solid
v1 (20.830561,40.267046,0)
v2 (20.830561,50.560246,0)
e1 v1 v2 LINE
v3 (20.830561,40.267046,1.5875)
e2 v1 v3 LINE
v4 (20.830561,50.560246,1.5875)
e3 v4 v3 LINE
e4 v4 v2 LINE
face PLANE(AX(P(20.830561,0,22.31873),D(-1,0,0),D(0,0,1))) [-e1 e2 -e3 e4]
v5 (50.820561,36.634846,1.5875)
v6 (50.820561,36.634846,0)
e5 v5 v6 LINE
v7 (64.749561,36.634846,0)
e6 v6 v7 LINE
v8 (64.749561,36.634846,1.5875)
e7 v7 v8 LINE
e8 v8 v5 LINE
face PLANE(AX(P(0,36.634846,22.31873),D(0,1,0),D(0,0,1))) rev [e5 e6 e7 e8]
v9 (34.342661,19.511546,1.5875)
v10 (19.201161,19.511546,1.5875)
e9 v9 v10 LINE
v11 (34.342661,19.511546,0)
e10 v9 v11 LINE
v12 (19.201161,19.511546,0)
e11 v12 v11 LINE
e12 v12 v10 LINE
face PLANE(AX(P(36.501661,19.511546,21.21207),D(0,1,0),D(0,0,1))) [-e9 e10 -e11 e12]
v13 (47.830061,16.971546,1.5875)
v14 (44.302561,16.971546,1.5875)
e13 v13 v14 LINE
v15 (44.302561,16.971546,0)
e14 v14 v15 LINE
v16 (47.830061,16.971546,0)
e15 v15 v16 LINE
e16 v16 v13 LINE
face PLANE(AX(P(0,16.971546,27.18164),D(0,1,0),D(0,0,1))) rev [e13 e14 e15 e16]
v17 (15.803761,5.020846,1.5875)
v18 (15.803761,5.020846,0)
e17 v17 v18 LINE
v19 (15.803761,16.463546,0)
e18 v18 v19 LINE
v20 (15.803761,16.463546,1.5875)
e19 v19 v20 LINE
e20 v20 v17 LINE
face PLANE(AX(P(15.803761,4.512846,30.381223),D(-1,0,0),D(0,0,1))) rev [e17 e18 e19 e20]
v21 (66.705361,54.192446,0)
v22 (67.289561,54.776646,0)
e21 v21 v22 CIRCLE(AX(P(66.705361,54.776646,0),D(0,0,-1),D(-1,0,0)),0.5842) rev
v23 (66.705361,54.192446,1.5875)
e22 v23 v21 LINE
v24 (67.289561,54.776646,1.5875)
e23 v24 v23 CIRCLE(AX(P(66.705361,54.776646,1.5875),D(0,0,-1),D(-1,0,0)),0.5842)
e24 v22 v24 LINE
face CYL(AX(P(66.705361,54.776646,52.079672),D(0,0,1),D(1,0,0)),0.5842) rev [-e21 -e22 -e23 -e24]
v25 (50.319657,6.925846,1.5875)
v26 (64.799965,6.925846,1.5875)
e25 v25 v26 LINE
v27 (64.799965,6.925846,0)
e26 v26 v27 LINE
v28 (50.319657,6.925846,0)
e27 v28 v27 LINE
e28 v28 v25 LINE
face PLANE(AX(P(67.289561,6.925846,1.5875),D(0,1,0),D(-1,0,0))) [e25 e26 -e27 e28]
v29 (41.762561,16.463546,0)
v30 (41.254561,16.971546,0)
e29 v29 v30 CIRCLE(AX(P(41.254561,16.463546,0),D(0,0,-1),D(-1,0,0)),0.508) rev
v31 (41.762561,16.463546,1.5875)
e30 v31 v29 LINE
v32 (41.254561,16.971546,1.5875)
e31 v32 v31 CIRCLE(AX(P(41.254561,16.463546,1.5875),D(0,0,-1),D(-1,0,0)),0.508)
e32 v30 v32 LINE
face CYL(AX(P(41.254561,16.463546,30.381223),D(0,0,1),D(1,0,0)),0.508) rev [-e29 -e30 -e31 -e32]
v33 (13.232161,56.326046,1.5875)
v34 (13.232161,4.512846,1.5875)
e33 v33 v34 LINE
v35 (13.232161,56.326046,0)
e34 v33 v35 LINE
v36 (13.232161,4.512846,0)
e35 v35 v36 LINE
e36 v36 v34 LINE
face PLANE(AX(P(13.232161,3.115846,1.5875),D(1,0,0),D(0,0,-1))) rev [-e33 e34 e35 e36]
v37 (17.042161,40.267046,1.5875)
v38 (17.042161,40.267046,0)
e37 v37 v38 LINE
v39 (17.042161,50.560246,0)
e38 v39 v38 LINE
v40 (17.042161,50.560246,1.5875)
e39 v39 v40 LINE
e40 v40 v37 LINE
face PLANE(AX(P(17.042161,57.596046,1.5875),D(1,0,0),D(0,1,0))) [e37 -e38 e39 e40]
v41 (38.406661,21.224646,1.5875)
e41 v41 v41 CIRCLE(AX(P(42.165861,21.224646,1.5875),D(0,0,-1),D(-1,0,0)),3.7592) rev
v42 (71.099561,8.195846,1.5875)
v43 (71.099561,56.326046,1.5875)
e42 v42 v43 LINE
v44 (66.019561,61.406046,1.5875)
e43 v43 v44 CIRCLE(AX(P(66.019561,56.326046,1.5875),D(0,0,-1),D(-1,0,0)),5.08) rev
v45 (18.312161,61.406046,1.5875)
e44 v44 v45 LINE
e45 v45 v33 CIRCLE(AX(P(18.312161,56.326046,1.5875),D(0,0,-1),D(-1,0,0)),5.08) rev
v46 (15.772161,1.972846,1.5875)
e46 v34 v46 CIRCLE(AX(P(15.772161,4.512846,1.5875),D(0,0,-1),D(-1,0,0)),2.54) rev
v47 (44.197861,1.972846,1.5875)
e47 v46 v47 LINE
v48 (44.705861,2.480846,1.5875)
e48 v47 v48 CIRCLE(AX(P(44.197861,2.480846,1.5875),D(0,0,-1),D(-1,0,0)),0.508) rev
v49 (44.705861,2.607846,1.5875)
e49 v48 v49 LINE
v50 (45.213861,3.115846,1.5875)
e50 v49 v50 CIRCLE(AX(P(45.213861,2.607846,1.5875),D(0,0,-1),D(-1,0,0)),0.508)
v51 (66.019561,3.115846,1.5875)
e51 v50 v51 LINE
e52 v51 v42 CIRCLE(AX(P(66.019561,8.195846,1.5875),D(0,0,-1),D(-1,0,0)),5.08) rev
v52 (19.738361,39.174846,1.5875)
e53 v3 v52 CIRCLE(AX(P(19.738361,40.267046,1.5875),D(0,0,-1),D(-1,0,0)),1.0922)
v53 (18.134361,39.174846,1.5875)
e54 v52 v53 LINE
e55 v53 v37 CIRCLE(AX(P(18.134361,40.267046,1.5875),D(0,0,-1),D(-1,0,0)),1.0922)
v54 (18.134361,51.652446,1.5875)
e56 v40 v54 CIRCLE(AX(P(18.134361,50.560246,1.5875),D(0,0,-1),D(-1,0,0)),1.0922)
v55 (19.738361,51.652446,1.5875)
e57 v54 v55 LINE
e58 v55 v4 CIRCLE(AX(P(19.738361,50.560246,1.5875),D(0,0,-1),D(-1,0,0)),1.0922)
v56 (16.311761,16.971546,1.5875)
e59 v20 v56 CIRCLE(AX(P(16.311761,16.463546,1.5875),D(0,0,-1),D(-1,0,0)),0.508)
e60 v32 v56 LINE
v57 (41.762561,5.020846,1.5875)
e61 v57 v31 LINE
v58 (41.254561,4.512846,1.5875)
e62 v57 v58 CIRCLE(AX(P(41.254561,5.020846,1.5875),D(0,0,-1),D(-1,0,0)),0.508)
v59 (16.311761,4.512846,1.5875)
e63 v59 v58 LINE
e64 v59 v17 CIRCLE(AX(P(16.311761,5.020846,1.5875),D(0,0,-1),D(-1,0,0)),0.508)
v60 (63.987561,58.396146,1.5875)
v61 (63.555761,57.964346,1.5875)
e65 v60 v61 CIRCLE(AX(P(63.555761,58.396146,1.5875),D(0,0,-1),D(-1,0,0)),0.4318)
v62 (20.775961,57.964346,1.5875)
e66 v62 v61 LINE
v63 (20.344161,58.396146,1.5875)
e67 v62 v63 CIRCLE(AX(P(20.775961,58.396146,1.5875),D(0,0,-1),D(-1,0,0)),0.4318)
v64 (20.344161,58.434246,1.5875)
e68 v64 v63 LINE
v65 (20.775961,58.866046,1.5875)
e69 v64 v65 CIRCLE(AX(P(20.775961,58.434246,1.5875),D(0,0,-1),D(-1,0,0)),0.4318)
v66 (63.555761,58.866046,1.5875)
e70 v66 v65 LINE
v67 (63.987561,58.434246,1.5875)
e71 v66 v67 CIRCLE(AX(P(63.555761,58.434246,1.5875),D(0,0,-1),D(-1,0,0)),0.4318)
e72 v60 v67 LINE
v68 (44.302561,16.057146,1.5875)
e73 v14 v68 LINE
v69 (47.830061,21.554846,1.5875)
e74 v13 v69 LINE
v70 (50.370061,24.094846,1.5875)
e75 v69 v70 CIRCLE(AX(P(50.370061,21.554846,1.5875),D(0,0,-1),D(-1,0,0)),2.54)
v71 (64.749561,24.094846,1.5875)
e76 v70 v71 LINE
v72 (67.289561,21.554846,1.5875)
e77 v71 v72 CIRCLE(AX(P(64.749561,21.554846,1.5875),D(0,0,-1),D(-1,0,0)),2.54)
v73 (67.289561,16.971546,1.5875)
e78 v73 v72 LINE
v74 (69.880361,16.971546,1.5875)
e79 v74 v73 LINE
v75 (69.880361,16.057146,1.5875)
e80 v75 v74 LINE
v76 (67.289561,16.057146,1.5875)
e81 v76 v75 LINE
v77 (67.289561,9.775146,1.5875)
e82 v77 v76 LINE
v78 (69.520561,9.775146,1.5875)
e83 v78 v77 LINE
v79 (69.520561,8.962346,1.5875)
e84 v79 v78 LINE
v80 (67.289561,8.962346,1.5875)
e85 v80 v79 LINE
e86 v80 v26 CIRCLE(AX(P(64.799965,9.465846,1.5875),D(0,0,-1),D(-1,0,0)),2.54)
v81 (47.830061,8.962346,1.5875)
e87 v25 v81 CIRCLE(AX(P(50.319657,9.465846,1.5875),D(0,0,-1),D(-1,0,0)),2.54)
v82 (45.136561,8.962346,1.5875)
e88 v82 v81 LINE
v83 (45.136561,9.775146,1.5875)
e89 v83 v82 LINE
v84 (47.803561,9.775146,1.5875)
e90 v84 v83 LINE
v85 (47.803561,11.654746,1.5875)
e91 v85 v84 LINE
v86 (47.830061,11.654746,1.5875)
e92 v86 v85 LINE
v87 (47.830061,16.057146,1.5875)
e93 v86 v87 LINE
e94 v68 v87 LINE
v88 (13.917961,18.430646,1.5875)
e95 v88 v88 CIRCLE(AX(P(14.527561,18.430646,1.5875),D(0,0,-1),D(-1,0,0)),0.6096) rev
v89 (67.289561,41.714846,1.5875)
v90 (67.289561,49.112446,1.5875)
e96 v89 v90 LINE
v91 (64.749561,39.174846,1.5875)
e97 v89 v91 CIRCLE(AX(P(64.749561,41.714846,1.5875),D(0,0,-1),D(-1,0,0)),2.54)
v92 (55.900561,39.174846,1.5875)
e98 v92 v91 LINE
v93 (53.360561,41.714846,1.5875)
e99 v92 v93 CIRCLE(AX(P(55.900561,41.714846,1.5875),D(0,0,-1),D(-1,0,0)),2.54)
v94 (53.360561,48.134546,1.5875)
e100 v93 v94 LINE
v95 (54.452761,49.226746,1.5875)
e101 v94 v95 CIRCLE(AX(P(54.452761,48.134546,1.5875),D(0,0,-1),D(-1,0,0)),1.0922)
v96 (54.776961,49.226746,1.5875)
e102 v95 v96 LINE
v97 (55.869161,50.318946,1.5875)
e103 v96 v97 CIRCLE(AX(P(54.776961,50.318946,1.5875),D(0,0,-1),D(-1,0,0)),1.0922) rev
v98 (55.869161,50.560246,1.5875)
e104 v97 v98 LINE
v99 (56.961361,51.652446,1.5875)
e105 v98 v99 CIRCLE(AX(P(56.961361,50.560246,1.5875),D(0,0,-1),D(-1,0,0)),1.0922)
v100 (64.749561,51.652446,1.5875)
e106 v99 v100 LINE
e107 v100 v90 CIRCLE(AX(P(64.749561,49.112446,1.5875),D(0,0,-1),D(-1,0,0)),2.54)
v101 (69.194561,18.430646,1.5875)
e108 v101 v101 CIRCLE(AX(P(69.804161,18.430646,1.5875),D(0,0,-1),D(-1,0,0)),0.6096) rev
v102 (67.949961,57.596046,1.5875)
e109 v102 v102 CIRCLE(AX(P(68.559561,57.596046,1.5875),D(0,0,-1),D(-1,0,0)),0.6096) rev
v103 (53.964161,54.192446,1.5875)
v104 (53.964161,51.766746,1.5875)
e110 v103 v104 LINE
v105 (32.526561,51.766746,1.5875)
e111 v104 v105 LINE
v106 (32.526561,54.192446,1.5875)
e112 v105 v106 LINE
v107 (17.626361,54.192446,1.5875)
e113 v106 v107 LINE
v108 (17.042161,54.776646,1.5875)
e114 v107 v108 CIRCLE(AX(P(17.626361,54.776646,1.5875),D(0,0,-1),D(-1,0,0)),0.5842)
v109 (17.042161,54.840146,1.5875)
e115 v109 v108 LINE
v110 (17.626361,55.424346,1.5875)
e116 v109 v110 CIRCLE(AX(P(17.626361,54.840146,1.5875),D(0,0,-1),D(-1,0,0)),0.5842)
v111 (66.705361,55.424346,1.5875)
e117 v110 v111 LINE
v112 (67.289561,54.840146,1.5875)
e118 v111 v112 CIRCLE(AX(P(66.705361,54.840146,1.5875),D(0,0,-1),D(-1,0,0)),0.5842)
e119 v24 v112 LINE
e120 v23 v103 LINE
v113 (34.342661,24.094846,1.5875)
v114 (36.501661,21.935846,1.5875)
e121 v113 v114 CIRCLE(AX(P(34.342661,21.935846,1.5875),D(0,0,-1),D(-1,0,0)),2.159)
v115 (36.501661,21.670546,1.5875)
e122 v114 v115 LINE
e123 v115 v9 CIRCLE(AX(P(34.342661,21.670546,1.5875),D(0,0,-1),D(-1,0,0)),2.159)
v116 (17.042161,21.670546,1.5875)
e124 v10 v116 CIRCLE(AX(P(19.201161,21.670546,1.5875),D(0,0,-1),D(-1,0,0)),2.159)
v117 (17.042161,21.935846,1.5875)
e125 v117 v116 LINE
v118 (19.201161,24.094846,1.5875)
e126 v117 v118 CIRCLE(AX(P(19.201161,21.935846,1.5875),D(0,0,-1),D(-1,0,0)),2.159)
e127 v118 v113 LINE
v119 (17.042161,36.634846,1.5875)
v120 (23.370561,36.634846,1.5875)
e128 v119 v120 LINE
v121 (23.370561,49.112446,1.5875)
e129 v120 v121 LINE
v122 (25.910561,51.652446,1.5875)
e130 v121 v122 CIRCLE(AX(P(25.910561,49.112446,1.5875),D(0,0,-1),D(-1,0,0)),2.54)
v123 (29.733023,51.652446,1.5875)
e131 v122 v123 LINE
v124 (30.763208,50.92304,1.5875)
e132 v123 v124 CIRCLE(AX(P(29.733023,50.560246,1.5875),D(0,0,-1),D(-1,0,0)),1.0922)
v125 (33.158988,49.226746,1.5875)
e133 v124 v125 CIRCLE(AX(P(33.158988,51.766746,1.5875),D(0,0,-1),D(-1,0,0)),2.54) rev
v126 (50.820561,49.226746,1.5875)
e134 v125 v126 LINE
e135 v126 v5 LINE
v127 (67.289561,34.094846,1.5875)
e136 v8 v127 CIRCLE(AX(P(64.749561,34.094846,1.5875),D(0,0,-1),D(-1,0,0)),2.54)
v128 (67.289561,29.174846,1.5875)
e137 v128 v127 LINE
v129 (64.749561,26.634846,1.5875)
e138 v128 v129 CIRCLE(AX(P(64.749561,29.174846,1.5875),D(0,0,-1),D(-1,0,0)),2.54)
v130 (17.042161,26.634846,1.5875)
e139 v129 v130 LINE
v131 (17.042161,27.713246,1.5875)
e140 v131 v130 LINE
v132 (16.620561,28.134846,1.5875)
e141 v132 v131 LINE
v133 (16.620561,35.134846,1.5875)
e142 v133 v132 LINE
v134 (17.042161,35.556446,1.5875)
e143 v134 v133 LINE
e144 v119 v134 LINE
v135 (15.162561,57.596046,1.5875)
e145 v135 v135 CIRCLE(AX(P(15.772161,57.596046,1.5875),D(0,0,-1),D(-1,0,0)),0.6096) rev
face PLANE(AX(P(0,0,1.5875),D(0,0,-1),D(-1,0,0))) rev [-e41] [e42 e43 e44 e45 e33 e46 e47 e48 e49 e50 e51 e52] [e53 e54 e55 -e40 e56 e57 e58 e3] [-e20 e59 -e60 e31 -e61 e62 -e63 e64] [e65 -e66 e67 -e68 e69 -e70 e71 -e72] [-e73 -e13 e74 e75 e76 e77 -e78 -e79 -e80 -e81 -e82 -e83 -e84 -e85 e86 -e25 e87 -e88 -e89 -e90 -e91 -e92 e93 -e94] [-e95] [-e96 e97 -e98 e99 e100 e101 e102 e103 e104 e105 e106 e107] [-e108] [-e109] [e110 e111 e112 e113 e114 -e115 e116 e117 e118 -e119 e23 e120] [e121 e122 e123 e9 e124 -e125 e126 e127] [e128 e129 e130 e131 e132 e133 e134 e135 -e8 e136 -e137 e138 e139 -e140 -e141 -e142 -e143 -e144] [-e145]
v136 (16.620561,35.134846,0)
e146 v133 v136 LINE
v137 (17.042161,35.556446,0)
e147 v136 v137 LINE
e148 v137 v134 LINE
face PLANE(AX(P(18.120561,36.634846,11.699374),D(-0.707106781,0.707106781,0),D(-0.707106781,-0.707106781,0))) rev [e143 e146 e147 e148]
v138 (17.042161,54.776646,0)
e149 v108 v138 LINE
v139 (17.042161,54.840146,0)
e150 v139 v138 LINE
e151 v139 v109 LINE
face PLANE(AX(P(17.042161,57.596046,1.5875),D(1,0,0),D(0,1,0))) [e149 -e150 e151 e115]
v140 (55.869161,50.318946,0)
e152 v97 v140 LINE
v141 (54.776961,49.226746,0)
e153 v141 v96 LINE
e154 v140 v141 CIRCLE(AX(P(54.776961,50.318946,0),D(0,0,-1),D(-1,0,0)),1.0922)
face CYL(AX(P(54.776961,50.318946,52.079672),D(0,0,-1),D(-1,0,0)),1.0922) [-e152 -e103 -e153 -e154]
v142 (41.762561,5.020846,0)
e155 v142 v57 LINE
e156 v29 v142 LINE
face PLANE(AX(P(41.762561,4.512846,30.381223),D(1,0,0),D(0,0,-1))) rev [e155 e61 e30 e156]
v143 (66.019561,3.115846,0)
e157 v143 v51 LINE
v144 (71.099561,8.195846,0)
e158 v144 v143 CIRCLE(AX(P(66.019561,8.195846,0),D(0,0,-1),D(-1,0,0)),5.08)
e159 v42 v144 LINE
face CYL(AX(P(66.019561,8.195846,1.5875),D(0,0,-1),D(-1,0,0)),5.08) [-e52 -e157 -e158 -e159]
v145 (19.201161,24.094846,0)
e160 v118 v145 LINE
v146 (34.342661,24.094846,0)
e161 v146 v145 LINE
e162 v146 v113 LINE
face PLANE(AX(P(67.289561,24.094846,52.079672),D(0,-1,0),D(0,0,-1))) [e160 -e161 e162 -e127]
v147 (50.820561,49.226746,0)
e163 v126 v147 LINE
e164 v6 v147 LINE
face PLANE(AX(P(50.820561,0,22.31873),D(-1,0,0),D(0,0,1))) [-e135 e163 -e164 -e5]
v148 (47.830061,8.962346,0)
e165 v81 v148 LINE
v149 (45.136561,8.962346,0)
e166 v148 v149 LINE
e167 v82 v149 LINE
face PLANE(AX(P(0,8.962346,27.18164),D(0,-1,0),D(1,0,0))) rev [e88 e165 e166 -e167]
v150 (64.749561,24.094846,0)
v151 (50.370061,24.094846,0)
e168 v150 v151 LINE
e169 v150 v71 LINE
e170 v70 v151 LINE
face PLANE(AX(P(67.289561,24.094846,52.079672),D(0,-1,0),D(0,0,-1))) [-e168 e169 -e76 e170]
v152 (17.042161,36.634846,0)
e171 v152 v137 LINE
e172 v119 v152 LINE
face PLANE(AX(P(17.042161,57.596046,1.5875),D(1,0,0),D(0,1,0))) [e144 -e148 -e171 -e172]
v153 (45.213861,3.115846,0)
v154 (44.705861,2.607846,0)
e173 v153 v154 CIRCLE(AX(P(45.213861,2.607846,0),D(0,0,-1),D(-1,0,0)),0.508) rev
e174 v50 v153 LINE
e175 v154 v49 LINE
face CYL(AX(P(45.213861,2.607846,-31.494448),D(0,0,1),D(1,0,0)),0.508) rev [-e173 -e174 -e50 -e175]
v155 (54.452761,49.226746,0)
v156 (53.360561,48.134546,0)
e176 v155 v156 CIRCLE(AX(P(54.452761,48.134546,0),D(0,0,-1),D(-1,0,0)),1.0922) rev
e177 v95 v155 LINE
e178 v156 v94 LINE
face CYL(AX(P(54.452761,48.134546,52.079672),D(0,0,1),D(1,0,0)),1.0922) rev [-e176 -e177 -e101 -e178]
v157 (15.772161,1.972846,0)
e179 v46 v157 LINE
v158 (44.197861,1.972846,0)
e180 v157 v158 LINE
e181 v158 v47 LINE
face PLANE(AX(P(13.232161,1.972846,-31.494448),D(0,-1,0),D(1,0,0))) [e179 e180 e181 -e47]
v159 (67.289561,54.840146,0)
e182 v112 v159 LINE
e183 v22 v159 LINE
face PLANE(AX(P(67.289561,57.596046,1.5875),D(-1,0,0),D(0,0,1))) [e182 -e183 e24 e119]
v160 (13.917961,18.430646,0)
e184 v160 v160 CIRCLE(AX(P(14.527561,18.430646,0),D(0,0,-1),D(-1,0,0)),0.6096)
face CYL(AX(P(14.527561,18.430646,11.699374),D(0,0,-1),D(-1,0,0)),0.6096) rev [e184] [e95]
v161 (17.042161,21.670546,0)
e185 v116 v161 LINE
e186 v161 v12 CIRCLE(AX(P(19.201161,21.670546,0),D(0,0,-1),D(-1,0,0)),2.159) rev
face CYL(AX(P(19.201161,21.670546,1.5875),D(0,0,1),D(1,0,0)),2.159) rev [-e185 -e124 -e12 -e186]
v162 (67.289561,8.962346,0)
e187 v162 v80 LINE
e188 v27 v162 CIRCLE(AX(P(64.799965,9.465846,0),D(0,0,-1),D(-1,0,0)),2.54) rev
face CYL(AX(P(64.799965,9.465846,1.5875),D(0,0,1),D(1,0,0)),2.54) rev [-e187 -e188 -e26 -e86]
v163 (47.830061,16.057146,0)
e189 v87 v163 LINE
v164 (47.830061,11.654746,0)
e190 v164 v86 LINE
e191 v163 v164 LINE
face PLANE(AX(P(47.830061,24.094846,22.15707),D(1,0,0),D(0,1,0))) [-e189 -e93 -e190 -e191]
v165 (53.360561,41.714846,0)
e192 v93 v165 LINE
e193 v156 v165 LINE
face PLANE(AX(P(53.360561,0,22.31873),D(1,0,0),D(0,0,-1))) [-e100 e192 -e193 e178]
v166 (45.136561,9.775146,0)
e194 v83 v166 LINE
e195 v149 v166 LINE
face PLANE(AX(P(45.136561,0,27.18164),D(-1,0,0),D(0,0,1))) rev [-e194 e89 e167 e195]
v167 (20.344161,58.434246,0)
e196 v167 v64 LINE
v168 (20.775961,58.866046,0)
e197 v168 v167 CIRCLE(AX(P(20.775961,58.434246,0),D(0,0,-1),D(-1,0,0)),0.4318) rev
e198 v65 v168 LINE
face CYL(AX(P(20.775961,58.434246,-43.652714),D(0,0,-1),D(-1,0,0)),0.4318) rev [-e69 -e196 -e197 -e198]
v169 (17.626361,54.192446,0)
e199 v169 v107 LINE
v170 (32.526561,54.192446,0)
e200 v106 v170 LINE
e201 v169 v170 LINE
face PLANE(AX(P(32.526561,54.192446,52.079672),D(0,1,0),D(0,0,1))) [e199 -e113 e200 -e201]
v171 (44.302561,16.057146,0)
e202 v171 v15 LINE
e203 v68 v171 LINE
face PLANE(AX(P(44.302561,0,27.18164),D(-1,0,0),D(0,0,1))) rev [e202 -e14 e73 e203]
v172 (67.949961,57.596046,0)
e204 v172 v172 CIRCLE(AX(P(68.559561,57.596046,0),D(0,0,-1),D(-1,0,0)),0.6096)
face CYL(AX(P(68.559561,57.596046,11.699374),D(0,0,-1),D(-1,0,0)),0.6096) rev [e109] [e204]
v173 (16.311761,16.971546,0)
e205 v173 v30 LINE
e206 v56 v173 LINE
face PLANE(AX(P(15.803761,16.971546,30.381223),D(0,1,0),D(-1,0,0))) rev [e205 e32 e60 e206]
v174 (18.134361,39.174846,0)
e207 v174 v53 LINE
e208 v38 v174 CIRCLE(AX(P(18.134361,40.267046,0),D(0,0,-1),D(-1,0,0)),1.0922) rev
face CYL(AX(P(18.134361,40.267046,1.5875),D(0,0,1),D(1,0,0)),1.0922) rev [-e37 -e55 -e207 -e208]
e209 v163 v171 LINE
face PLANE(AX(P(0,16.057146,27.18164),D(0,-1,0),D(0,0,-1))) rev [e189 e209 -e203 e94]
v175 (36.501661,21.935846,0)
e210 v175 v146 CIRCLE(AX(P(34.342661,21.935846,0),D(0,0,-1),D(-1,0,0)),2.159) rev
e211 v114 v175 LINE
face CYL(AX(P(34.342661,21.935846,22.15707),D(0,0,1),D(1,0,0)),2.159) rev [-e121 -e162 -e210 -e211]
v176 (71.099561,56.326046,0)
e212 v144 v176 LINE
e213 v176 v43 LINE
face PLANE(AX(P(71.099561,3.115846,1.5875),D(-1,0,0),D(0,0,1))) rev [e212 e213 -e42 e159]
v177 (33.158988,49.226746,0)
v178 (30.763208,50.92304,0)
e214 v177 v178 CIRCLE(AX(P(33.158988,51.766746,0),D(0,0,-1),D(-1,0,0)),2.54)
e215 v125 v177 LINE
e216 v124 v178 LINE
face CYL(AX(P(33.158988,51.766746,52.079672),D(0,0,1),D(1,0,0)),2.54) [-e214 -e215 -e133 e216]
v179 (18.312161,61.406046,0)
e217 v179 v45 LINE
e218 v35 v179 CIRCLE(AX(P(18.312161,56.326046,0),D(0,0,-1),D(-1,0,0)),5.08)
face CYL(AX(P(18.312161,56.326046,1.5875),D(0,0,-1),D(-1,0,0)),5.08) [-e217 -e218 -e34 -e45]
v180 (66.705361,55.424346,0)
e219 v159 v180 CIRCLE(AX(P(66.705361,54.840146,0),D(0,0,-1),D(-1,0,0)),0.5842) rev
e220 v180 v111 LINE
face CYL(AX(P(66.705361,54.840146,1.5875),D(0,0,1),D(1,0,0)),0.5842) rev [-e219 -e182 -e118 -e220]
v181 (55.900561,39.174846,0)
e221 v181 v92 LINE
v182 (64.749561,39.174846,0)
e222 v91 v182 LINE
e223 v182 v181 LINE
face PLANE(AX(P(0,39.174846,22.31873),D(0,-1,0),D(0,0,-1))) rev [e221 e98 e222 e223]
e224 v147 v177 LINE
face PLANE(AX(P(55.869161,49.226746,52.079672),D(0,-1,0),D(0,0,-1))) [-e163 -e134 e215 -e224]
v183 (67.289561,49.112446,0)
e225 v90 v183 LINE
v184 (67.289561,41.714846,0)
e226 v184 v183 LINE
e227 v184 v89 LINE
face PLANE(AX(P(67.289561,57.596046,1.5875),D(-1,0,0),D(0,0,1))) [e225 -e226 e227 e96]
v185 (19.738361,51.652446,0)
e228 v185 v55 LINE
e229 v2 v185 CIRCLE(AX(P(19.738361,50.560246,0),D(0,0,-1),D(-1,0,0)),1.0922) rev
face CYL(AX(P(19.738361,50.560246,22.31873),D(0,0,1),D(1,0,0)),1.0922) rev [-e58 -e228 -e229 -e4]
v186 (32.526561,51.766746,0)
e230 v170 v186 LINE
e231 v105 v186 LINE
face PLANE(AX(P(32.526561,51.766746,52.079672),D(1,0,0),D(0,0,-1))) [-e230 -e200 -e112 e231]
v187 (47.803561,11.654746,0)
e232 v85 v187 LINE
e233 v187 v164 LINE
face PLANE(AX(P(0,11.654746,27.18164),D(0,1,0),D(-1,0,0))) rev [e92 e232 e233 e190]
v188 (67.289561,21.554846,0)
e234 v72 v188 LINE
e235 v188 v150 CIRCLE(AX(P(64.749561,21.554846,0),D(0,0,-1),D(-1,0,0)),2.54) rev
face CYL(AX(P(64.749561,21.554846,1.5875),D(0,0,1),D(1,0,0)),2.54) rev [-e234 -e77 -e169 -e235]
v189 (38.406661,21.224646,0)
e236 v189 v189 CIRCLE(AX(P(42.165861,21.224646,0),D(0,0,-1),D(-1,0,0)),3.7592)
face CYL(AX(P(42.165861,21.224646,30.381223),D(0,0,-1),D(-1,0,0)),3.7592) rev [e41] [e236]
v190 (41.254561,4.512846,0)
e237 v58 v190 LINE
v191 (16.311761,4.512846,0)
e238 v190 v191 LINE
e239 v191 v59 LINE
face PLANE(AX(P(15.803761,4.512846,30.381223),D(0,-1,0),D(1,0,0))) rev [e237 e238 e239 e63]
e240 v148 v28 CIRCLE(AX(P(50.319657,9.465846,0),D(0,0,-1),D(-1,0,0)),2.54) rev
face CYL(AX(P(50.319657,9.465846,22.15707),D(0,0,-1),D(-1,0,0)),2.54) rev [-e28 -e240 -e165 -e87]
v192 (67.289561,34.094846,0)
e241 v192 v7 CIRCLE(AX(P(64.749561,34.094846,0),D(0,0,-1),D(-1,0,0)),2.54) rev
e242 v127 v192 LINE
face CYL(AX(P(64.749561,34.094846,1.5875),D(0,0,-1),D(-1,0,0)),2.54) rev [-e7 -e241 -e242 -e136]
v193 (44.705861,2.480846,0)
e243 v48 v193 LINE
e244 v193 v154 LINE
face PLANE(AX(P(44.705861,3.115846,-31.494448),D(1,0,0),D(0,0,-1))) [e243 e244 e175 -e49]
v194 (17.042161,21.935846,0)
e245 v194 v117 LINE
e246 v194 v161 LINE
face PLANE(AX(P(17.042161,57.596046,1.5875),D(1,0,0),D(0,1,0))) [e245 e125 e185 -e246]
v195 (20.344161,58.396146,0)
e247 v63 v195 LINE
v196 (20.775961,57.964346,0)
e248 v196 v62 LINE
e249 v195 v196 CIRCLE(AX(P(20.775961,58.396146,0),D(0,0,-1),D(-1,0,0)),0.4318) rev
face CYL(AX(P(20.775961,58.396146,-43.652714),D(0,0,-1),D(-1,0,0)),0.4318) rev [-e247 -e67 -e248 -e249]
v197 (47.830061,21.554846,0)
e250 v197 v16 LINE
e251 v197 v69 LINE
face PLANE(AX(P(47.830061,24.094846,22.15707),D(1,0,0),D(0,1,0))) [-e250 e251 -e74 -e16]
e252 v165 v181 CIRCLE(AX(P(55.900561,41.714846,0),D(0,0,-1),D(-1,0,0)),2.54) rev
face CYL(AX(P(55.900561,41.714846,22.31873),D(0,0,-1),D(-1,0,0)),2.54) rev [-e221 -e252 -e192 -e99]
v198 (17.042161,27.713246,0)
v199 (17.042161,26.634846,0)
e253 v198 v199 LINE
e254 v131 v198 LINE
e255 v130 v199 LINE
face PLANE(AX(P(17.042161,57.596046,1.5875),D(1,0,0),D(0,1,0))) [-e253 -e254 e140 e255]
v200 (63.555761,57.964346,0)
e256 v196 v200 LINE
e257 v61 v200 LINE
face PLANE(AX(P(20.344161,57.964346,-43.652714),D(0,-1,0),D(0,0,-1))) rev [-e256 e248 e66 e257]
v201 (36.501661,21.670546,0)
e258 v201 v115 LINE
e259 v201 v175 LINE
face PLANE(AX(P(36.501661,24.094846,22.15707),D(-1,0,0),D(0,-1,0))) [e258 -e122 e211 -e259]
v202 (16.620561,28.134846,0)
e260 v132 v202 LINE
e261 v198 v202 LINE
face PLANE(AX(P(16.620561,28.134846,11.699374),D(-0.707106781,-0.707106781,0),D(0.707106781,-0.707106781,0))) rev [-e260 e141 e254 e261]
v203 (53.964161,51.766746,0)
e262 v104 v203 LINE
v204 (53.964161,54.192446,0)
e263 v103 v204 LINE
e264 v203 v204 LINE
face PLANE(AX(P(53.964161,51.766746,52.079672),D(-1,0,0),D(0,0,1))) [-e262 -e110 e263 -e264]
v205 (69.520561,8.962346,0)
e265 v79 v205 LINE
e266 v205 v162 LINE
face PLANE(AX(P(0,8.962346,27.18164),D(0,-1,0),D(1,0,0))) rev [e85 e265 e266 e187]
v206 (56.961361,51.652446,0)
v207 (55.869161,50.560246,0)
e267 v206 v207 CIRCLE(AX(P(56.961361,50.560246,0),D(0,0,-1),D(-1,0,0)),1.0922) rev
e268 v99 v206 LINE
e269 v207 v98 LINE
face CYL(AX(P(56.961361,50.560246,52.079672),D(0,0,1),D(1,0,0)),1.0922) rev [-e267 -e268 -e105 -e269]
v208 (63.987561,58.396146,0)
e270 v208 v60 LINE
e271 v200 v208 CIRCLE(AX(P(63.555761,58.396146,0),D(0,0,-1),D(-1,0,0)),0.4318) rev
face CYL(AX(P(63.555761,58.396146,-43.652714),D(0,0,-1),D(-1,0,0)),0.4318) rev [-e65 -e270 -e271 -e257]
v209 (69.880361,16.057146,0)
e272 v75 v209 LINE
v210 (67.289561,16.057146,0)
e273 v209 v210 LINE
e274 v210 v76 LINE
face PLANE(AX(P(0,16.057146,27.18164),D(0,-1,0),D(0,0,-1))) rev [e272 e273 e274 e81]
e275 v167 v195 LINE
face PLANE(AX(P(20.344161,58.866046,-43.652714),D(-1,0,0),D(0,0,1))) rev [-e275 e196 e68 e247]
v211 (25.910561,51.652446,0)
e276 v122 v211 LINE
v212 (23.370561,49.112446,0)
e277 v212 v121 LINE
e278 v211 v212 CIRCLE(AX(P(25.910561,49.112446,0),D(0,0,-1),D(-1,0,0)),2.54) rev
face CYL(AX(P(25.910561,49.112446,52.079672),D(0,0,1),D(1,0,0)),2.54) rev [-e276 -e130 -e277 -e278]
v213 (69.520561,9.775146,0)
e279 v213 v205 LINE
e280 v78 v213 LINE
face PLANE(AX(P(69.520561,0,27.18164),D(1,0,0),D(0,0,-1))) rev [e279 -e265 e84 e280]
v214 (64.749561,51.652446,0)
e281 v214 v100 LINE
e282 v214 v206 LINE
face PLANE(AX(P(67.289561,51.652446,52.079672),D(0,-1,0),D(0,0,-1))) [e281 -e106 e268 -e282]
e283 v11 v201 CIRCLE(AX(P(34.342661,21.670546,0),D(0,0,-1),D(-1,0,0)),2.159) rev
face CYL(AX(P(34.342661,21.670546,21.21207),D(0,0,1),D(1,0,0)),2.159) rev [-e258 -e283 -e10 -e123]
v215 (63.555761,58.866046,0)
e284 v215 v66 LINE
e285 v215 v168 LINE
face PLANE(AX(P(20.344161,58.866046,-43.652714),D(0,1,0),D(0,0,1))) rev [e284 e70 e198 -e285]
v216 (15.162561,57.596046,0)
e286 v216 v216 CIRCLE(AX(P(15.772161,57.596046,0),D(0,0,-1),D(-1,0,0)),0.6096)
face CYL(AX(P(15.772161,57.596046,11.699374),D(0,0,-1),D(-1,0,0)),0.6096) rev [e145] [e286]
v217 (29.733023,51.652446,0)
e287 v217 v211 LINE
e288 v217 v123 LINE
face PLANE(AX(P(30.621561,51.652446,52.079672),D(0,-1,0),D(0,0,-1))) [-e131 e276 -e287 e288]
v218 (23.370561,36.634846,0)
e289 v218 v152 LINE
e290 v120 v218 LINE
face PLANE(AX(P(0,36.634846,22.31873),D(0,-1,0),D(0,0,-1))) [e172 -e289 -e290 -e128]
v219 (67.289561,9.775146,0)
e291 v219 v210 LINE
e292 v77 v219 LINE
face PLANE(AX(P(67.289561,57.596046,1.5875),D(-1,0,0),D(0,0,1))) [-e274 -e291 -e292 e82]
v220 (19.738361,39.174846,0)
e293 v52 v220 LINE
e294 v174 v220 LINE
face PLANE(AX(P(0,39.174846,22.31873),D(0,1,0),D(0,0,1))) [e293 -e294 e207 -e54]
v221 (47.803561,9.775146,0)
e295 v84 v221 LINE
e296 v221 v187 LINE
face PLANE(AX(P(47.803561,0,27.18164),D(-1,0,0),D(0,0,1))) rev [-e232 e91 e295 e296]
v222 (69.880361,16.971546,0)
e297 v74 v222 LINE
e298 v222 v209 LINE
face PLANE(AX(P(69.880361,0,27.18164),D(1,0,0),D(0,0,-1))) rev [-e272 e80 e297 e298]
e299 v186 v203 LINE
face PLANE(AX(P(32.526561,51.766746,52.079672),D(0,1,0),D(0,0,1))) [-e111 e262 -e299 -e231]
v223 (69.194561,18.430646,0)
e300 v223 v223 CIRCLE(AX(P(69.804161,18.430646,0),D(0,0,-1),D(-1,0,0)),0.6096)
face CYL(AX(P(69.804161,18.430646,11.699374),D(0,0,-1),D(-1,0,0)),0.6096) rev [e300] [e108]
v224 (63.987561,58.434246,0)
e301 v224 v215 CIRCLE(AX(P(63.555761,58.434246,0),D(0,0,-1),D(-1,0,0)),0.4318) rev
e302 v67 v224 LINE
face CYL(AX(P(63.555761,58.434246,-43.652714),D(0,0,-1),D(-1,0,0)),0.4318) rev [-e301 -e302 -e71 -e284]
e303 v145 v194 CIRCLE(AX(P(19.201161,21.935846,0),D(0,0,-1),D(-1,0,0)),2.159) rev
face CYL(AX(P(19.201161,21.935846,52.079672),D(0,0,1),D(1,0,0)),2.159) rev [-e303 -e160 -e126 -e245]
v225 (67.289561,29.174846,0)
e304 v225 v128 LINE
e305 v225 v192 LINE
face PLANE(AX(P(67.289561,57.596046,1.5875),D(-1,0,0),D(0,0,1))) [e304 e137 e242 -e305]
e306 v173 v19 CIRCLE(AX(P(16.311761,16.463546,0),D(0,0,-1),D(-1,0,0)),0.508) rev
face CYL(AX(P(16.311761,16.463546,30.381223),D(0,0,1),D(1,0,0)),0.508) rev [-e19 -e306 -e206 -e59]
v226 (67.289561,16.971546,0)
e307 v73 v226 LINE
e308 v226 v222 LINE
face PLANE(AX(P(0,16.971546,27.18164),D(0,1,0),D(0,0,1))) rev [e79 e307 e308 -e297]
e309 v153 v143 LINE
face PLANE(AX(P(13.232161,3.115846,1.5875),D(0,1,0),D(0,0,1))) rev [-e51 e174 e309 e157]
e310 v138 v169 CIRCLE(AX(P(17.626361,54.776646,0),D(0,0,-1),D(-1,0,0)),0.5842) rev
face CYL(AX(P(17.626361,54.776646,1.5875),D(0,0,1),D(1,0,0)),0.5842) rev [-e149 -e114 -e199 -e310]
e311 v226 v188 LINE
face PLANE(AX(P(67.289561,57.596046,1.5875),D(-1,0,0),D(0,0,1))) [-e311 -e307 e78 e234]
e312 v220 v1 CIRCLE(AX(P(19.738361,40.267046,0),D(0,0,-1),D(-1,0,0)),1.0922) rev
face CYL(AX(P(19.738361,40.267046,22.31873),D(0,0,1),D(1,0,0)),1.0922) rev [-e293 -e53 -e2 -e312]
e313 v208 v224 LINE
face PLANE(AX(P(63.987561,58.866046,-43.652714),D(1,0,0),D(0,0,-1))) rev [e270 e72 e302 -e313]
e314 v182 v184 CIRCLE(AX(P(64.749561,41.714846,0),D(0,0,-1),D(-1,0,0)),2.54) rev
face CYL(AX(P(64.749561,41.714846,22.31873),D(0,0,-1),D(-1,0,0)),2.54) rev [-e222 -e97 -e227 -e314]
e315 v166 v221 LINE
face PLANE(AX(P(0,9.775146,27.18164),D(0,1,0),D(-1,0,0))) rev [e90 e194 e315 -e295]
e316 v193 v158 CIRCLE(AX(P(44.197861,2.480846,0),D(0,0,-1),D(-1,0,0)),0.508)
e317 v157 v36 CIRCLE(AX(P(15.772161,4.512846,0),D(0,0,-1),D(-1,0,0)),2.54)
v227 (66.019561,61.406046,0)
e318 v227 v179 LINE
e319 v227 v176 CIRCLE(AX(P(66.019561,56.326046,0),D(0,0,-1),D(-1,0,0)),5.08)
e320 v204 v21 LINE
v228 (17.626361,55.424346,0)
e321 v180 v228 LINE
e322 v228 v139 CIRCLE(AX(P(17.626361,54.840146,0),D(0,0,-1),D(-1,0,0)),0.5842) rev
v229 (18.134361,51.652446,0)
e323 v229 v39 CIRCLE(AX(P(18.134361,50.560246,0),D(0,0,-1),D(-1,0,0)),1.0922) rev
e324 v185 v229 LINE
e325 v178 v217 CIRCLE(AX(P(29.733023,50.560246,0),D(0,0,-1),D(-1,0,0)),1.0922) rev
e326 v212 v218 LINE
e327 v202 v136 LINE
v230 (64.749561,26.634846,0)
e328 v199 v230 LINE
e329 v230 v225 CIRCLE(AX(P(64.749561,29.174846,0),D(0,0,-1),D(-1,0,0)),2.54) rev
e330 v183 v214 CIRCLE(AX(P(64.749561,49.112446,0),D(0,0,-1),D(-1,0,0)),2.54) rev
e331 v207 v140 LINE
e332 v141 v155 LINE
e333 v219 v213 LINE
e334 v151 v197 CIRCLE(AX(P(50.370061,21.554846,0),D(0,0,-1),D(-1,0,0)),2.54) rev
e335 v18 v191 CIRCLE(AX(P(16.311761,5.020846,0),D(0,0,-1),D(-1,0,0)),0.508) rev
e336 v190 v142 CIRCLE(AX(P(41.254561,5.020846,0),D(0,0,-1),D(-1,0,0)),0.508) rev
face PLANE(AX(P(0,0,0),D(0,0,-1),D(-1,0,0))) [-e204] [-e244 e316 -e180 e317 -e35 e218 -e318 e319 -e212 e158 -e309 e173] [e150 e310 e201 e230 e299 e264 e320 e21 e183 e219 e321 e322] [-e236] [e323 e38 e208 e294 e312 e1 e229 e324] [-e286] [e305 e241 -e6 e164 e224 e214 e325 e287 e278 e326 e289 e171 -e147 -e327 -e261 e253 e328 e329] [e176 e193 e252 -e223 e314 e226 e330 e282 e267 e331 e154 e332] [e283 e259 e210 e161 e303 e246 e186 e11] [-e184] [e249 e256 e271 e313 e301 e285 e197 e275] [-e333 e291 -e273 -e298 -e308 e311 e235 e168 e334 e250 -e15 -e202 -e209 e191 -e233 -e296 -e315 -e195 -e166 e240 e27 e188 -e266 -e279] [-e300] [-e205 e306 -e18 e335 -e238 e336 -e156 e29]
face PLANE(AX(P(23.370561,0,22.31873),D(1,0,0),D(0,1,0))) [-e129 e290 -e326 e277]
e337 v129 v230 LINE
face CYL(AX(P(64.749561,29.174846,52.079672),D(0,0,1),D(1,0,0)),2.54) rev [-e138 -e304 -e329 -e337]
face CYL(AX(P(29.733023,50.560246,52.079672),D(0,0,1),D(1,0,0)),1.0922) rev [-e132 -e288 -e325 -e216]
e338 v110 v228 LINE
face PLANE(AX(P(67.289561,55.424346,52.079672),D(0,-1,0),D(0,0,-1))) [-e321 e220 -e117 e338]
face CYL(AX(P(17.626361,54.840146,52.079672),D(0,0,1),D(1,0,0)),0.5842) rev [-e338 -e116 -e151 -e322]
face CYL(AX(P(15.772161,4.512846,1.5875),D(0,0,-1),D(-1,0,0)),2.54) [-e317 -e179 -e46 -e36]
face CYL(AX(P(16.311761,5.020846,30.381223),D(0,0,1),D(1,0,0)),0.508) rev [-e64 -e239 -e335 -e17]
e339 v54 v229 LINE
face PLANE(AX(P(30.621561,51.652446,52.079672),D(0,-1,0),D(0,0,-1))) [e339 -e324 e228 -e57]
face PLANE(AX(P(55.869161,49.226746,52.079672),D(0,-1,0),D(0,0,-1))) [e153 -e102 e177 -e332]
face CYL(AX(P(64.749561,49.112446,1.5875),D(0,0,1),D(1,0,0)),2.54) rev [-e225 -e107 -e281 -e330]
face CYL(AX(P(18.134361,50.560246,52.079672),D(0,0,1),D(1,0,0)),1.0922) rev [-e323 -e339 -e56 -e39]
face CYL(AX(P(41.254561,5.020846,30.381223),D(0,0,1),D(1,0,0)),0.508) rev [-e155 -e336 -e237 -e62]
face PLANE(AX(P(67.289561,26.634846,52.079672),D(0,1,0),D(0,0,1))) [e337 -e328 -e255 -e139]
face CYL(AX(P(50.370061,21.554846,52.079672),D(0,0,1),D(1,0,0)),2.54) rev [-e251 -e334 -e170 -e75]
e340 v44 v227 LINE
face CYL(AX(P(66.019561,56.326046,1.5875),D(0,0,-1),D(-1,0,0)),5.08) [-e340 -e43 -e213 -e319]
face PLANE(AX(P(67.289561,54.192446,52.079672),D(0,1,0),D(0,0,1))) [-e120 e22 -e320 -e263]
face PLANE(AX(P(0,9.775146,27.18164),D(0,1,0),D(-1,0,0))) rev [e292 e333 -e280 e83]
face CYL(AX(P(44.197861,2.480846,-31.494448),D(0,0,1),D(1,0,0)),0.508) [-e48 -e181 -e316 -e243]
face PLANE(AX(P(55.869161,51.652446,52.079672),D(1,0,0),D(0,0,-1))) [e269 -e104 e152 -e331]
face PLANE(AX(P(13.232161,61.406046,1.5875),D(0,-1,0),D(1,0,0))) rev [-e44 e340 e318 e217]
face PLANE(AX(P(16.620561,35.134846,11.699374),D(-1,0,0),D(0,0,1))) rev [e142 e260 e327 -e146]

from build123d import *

# Parameters (mm, degrees)
SKETCH1_W           = 57.8674
SKETCH1_H           = 58.2902
SKETCH1_W_2         = 50.2474
SKETCH1_H_2         = 50.6702
BOSS_EXTRUDE1_DEPTH = 1.5875
SKETCH2_W           = 50.2474
SKETCH2_H           = 2.54
SKETCH2_H_2         = 2.1717
BOSS_EXTRUDE2_DEPTH = 1.5875
BOSS_EXTRUDE3_DEPTH = 1.5875
SKETCH4_W           = 11.3284
SKETCH4_H           = 17.169
BOSS_EXTRUDE4_DEPTH = 1.5875
SKETCH5_R           = 3.7592
SKETCH5_W           = 25.9588
SKETCH5_H           = 12.4587
CUT_EXTRUDE1_DEPTH  = 1.5875
SKETCH8_W           = 19.4595
SKETCH8_H           = 2.54
BOSS_EXTRUDE5_DEPTH = 1.5875
FILLET1_R           = 5.08
FILLET2_START       = -1
FILLET2_DEPTH       = 4
FILLET2_2_DEPTH     = 1.5875
FILLET3_R           = 1.0922
FILLET4_R           = 0.5842
FILLET8_R           = 2.159
SKETCH6_R           = 0.6096
CUT_EXTRUDE2_DEPTH  = 1.5875
SKETCH7_W           = 24.384
SKETCH7_H           = 0.8128
SKETCH7_W_2         = 19.05
SKETCH7_H_2         = 1.8796
SKETCH7_W_3         = 25.5778
SKETCH7_H_3         = 0.9144
CUT_EXTRUDE3_DEPTH  = 1.5875
FILLET6_R           = 0.508
SKETCH9_W           = 43.6434
SKETCH9_H           = 0.9017
CUT_EXTRUDE4_DEPTH  = 1.5875
FILLET7_R           = 0.4318
FILLET9_R           = 2.54
SKETCH10_W          = 31.4737
SKETCH10_H          = 1.143
BOSS_EXTRUDE6_DEPTH = 1.5875
FILLET10_R          = 2.54
FILLET11_R          = 0.508


with BuildPart() as part:
    # Sketch1 → Boss-Extrude1 (new body)
    with BuildSketch(Plane.XY):
        with Locations((42.165860751, 32.260946044)):
            Rectangle(SKETCH1_W, SKETCH1_H)
        with Locations((42.165860751, 32.260946044)):
            Rectangle(SKETCH1_W_2, SKETCH1_H_2, mode=Mode.SUBTRACT)
    extrude(amount=BOSS_EXTRUDE1_DEPTH)

    # Sketch2 → Boss-Extrude2 (add)
    with BuildSketch(Plane(origin=(0, 0, 0), x_dir=(-1, 0, 0), z_dir=(0, 0, -1))):
        with Locations((-42.165860751, 25.364846044)):
            Rectangle(SKETCH2_W, SKETCH2_H)
        Polygon((-67.289560751, 54.192446044), (-53.964160751, 54.192446044), (-53.964160751, 51.766746044), (-32.526560751, 51.766746044), (-32.526560751, 54.192446044), (-17.042160751, 54.192446044), (-17.042160751, 51.652446044), (-30.621560751, 51.652446044), (-30.621560751, 49.226746044), (-55.869160751, 49.226746044), (-55.869160751, 51.652446044), (-67.289560751, 51.652446044), align=None)
        with Locations((-42.165860751, 56.510196044)):
            Rectangle(SKETCH2_W, SKETCH2_H_2)
    extrude(amount=-BOSS_EXTRUDE2_DEPTH)

    # Sketch3 → Boss-Extrude3 (add)
    with BuildSketch(Plane(origin=(0, 0, 0), x_dir=(-1, 0, 0), z_dir=(0, 0, -1))):
        Polygon((-57.820560751, 36.634846044), (-50.820560751, 36.634846044), (-50.820560751, 28.408046044), (-50.820560751, 49.226746044), (-53.360560751, 49.226746044), (-53.360560751, 39.174846044), (-67.289560751, 39.174846044), (-67.289560751, 36.634846044), align=None)
        Polygon((-23.370560751, 36.634846044), (-20.120560751, 36.634846044), (-17.042160751, 36.634846044), (-17.042160751, 39.174846044), (-20.830560751, 39.174846044), (-20.830560751, 51.652446044), (-23.370560751, 51.652446044), align=None)
    extrude(amount=-BOSS_EXTRUDE3_DEPTH)

    # Sketch4 → Boss-Extrude4 (add)
    with BuildSketch(Plane(origin=(0, 0, 0), x_dir=(-1, 0, 0), z_dir=(0, 0, -1))):
        with Locations((-42.165860751, 15.510346044)):
            Rectangle(SKETCH4_W, SKETCH4_H)
    extrude(amount=-BOSS_EXTRUDE4_DEPTH)

    # Sketch5 → Cut-Extrude1 (cut)
    with BuildSketch(Plane(origin=(0, 0, 0), x_dir=(-1, 0, 0), z_dir=(0, 0, -1))):
        with Locations((-42.165860751, 21.224646044)):
            Circle(SKETCH5_R)
        with Locations((-28.783160751, 10.742196044)):
            Rectangle(SKETCH5_W, SKETCH5_H)
    extrude(amount=-CUT_EXTRUDE1_DEPTH, mode=Mode.SUBTRACT)

    # Sketch8 → Boss-Extrude5 (add)
    with BuildSketch(Plane(origin=(0, 0, 0), x_dir=(-1, 0, 0), z_dir=(0, 0, -1))):
        with Locations((-26.771910751, 18.241546044)):
            Rectangle(SKETCH8_W, SKETCH8_H)
    extrude(amount=-BOSS_EXTRUDE5_DEPTH)

    # Fillet1
    fillet1_edges = [part.edges().sort_by_distance(p)[0] for p in [
        (13.232160751, 61.406046044, 0.79375),
        (71.099560751, 61.406046044, 0.79375),
        (71.099560751, 3.115846044, 0.79375),
    ]]
    fillet(fillet1_edges, radius=FILLET1_R)

    # Fillet2: read off the stored shape, not the designer's step
    # Fillet2 outline → Fillet2 (cut)
    with BuildSketch(Plane.XY.offset(FILLET2_START)):
        with BuildLine():
            ThreePointArc((33.158987698, 49.226746044), (31.403812778, 49.930728342), (30.621560751, 51.652446044))
            Line((30.621560751, 51.652446044), (30.621560751, 49.226746044))
            Line((30.621560751, 49.226746044), (33.158987698, 49.226746044))
        make_face()
    extrude(amount=FILLET2_DEPTH, mode=Mode.SUBTRACT)

    # Fillet2 2 outline → Fillet2 2 (add)
    with BuildSketch(Plane.XY):
        with BuildLine():
            Line((67.289560751, 36.634846044), (64.749560751, 36.634846044))
            ThreePointArc((64.749560751, 36.634846044), (66.545611975, 35.890897268), (67.289560751, 34.094846044))
            Line((67.289560751, 34.094846044), (67.289560751, 36.634846044))
        make_face()
        with BuildLine():
            Line((67.289560751, 26.634846044), (67.289560751, 29.174846044))
            ThreePointArc((67.289560751, 29.174846044), (66.545611975, 27.37879482), (64.749560751, 26.634846044))
            Line((64.749560751, 26.634846044), (67.289560751, 26.634846044))
        make_face()
        with BuildLine():
            ThreePointArc((23.370560751, 49.112446044), (24.114509527, 50.908497268), (25.910560751, 51.652446044))
            Line((25.910560751, 51.652446044), (23.370560751, 51.652446044))
            Line((23.370560751, 51.652446044), (23.370560751, 49.112446044))
        make_face()
        with BuildLine():
            ThreePointArc((64.749560751, 51.652446044), (66.545611975, 50.908497268), (67.289560751, 49.112446044))
            Line((67.289560751, 49.112446044), (67.289560751, 51.652446044))
            Line((67.289560751, 51.652446044), (64.749560751, 51.652446044))
        make_face()
        with BuildLine():
            Line((53.360560751, 39.174846044), (55.900560751, 39.174846044))
            ThreePointArc((55.900560751, 39.174846044), (54.104509527, 39.91879482), (53.360560751, 41.714846044))
            Line((53.360560751, 41.714846044), (53.360560751, 39.174846044))
        make_face()
        with BuildLine():
            Line((67.289560751, 39.174846044), (67.289560751, 41.714846044))
            ThreePointArc((67.289560751, 41.714846044), (66.545611975, 39.91879482), (64.749560751, 39.174846044))
            Line((64.749560751, 39.174846044), (67.289560751, 39.174846044))
        make_face()
    extrude(amount=FILLET2_2_DEPTH)

    # Fillet3
    fillet3_edges = [part.edges().sort_by_distance(p)[0] for p in [
        (20.830560751, 51.652446044, 0.79375),
        (20.830560751, 39.174846044, 0.79375),
        (17.042160751, 39.174846044, 0.79375),
        (17.042160751, 51.652446044, 0.79375),
        (30.621560751, 51.652446044, 0.79375),
        (55.869160751, 49.226746044, 0.79375),
        (55.869160751, 51.652446044, 0.79375),
        (53.360560751, 49.226746044, 0.79375),
    ]]
    fillet(fillet3_edges, radius=FILLET3_R)

    # Fillet4
    fillet4_edges = [part.edges().sort_by_distance(p)[0] for p in [
        (17.042160751, 54.192446044, 0.79375),
        (67.289560751, 54.192446044, 0.79375),
        (67.289560751, 55.424346044, 0.79375),
        (17.042160751, 55.424346044, 0.79375),
    ]]
    fillet(fillet4_edges, radius=FILLET4_R)

    # Fillet8
    fillet8_edges = [part.edges().sort_by_distance(p)[0] for p in [
        (36.501660751, 24.094846044, 0.79375),
        (36.501660751, 19.511546044, 0.79375),
        (17.042160751, 19.511546044, 0.79375),
        (17.042160751, 24.094846044, 0.79375),
    ]]
    fillet(fillet8_edges, radius=FILLET8_R)

    # Sketch6 → Cut-Extrude2 (cut)
    with BuildSketch(Plane(origin=(0, 0, 0), x_dir=(-1, 0, 0), z_dir=(0, 0, -1))):
        with Locations((-68.559560751, 57.596046044)):
            Circle(SKETCH6_R)
        with Locations((-14.527560751, 18.430646044)):
            Circle(SKETCH6_R)
        with Locations((-69.804160751, 18.430646044)):
            Circle(SKETCH6_R)
        with Locations((-15.772160751, 57.596046044)):
            Circle(SKETCH6_R)
        Polygon((-16.620560751, 28.134846044), (-18.120560751, 26.634846044), (-18.120560751, 36.634846044), (-16.620560751, 35.134846044), align=None)
    extrude(amount=-CUT_EXTRUDE2_DEPTH, mode=Mode.SUBTRACT)

    # Sketch7 → Cut-Extrude3 (cut)
    with BuildSketch(Plane(origin=(0, 0, 0), x_dir=(-1, 0, 0), z_dir=(0, 0, -1))):
        with Locations((-57.328560751, 9.368745978)):
            Rectangle(SKETCH7_W, SKETCH7_H)
        with Locations((-57.328560751, 10.714945978)):
            Rectangle(SKETCH7_W_2, SKETCH7_H_2)
        with Locations((-57.091460751, 16.514346044)):
            Rectangle(SKETCH7_W_3, SKETCH7_H_3)
    extrude(amount=-CUT_EXTRUDE3_DEPTH, mode=Mode.SUBTRACT)

    # Fillet6
    fillet6_edges = [part.edges().sort_by_distance(p)[0] for p in [
        (15.803760751, 16.971546044, 0.79375),
        (15.803760751, 4.512846044, 0.79375),
        (41.762560751, 4.512846044, 0.79375),
        (41.762560751, 16.971546044, 0.79375),
    ]]
    fillet(fillet6_edges, radius=FILLET6_R)

    # Sketch9 → Cut-Extrude4 (cut)
    with BuildSketch(Plane.XY.offset(1.5875)):
        with Locations((42.165860751, 58.415196044)):
            Rectangle(SKETCH9_W, SKETCH9_H)
    extrude(amount=-CUT_EXTRUDE4_DEPTH, mode=Mode.SUBTRACT)

    # Fillet7
    fillet7_edges = [part.edges().sort_by_distance(p)[0] for p in [
        (63.987560751, 57.964346044, 0.79375),
        (63.987560751, 58.866046044, 0.79375),
        (20.344160751, 58.866046044, 0.79375),
        (20.344160751, 57.964346044, 0.79375),
    ]]
    fillet(fillet7_edges, radius=FILLET7_R)

    # Fillet9
    # the kernel refuses this fillet: 2.54 mm, written as the material it adds along each edge
    with BuildSketch(Plane(origin=(47.830060751, 6.925846044, 0), x_dir=(1, 0, 0), z_dir=(0, 0, 1))) as fillet9_piece_1:
        with BuildLine():
            CenterArc((2.489595888, 2.54), FILLET9_R, 191.433378163, 78.566621837)
            Line((0, 2.036499934), (-0.049791918, 2.026429933))
            ThreePointArc((-0.049791918, 2.026429933), (-0.0508, 1.018249967), (-0.0508, 0))
            Line((-0.0508, 0), (0, -0.0508))
            Line((0, -0.0508), (2.489595888, -0.0508))
            Line((2.489595888, -0.0508), (2.489595888, 0))
        make_face()
    extrude(amount=1.5875)
    with BuildSketch(Plane(origin=(47.830060751, 24.094846044, 0), x_dir=(1, 0, 0), z_dir=(0, 0, 1)), Plane(origin=(67.289560751, 24.094846044, 0), x_dir=(0, -1, 0), z_dir=(0, 0, 1))) as fillet9_piece_2:
        with BuildLine():
            CenterArc((FILLET9_R, -FILLET9_R), FILLET9_R, 90, 90)
            Line((0, -FILLET9_R), (-FILLET9_R * 0.02, -FILLET9_R))
            Line((-FILLET9_R * 0.02, -FILLET9_R), (-FILLET9_R * 0.02, FILLET9_R * 0.02))
            Line((-FILLET9_R * 0.02, FILLET9_R * 0.02), (FILLET9_R, FILLET9_R * 0.02))
            Line((FILLET9_R, FILLET9_R * 0.02), (FILLET9_R, 0))
        make_face()
    extrude(amount=1.5875)
    with BuildSketch(Plane(origin=(67.289560751, 6.925846044, 0), x_dir=(-1.3886374564076336e-12, 1.0, 0), z_dir=(0, 0, 1))) as fillet9_piece_3:
        with BuildLine():
            CenterArc((2.54, 2.489595888), FILLET9_R, 180, 78.566621837)
            Line((0, 2.489595888), (-0.0508, 2.489595888))
            Line((-0.0508, 2.489595888), (-0.0508, 0))
            Line((-0.0508, 0), (0, -0.0508))
            ThreePointArc((0, -0.0508), (1.018249967, -0.0508), (2.026429933, -0.049791918))
            Line((2.026429933, -0.049791918), (2.036499934, 0))
        make_face()
    extrude(amount=1.5875)

    # Sketch10 → Boss-Extrude6 (add)
    with BuildSketch(Plane.XY.offset(1.5875)):
        with Locations((28.969010751, 2.544346044)):
            Rectangle(SKETCH10_W, SKETCH10_H)
    extrude(amount=-BOSS_EXTRUDE6_DEPTH)

    # Fillet10
    fillet10_edges = [part.edges().sort_by_distance(p)[0] for p in [
        (13.232160751, 1.972846044, 0.79375),
    ]]
    fillet(fillet10_edges, radius=FILLET10_R)

    # Fillet11
    fillet11_edges = [part.edges().sort_by_distance(p)[0] for p in [
        (44.705860751, 1.972846044, 0.79375),
        (44.705860751, 3.115846044, 0.79375),
    ]]
    fillet(fillet11_edges, radius=FILLET11_R)


solid = part.part
